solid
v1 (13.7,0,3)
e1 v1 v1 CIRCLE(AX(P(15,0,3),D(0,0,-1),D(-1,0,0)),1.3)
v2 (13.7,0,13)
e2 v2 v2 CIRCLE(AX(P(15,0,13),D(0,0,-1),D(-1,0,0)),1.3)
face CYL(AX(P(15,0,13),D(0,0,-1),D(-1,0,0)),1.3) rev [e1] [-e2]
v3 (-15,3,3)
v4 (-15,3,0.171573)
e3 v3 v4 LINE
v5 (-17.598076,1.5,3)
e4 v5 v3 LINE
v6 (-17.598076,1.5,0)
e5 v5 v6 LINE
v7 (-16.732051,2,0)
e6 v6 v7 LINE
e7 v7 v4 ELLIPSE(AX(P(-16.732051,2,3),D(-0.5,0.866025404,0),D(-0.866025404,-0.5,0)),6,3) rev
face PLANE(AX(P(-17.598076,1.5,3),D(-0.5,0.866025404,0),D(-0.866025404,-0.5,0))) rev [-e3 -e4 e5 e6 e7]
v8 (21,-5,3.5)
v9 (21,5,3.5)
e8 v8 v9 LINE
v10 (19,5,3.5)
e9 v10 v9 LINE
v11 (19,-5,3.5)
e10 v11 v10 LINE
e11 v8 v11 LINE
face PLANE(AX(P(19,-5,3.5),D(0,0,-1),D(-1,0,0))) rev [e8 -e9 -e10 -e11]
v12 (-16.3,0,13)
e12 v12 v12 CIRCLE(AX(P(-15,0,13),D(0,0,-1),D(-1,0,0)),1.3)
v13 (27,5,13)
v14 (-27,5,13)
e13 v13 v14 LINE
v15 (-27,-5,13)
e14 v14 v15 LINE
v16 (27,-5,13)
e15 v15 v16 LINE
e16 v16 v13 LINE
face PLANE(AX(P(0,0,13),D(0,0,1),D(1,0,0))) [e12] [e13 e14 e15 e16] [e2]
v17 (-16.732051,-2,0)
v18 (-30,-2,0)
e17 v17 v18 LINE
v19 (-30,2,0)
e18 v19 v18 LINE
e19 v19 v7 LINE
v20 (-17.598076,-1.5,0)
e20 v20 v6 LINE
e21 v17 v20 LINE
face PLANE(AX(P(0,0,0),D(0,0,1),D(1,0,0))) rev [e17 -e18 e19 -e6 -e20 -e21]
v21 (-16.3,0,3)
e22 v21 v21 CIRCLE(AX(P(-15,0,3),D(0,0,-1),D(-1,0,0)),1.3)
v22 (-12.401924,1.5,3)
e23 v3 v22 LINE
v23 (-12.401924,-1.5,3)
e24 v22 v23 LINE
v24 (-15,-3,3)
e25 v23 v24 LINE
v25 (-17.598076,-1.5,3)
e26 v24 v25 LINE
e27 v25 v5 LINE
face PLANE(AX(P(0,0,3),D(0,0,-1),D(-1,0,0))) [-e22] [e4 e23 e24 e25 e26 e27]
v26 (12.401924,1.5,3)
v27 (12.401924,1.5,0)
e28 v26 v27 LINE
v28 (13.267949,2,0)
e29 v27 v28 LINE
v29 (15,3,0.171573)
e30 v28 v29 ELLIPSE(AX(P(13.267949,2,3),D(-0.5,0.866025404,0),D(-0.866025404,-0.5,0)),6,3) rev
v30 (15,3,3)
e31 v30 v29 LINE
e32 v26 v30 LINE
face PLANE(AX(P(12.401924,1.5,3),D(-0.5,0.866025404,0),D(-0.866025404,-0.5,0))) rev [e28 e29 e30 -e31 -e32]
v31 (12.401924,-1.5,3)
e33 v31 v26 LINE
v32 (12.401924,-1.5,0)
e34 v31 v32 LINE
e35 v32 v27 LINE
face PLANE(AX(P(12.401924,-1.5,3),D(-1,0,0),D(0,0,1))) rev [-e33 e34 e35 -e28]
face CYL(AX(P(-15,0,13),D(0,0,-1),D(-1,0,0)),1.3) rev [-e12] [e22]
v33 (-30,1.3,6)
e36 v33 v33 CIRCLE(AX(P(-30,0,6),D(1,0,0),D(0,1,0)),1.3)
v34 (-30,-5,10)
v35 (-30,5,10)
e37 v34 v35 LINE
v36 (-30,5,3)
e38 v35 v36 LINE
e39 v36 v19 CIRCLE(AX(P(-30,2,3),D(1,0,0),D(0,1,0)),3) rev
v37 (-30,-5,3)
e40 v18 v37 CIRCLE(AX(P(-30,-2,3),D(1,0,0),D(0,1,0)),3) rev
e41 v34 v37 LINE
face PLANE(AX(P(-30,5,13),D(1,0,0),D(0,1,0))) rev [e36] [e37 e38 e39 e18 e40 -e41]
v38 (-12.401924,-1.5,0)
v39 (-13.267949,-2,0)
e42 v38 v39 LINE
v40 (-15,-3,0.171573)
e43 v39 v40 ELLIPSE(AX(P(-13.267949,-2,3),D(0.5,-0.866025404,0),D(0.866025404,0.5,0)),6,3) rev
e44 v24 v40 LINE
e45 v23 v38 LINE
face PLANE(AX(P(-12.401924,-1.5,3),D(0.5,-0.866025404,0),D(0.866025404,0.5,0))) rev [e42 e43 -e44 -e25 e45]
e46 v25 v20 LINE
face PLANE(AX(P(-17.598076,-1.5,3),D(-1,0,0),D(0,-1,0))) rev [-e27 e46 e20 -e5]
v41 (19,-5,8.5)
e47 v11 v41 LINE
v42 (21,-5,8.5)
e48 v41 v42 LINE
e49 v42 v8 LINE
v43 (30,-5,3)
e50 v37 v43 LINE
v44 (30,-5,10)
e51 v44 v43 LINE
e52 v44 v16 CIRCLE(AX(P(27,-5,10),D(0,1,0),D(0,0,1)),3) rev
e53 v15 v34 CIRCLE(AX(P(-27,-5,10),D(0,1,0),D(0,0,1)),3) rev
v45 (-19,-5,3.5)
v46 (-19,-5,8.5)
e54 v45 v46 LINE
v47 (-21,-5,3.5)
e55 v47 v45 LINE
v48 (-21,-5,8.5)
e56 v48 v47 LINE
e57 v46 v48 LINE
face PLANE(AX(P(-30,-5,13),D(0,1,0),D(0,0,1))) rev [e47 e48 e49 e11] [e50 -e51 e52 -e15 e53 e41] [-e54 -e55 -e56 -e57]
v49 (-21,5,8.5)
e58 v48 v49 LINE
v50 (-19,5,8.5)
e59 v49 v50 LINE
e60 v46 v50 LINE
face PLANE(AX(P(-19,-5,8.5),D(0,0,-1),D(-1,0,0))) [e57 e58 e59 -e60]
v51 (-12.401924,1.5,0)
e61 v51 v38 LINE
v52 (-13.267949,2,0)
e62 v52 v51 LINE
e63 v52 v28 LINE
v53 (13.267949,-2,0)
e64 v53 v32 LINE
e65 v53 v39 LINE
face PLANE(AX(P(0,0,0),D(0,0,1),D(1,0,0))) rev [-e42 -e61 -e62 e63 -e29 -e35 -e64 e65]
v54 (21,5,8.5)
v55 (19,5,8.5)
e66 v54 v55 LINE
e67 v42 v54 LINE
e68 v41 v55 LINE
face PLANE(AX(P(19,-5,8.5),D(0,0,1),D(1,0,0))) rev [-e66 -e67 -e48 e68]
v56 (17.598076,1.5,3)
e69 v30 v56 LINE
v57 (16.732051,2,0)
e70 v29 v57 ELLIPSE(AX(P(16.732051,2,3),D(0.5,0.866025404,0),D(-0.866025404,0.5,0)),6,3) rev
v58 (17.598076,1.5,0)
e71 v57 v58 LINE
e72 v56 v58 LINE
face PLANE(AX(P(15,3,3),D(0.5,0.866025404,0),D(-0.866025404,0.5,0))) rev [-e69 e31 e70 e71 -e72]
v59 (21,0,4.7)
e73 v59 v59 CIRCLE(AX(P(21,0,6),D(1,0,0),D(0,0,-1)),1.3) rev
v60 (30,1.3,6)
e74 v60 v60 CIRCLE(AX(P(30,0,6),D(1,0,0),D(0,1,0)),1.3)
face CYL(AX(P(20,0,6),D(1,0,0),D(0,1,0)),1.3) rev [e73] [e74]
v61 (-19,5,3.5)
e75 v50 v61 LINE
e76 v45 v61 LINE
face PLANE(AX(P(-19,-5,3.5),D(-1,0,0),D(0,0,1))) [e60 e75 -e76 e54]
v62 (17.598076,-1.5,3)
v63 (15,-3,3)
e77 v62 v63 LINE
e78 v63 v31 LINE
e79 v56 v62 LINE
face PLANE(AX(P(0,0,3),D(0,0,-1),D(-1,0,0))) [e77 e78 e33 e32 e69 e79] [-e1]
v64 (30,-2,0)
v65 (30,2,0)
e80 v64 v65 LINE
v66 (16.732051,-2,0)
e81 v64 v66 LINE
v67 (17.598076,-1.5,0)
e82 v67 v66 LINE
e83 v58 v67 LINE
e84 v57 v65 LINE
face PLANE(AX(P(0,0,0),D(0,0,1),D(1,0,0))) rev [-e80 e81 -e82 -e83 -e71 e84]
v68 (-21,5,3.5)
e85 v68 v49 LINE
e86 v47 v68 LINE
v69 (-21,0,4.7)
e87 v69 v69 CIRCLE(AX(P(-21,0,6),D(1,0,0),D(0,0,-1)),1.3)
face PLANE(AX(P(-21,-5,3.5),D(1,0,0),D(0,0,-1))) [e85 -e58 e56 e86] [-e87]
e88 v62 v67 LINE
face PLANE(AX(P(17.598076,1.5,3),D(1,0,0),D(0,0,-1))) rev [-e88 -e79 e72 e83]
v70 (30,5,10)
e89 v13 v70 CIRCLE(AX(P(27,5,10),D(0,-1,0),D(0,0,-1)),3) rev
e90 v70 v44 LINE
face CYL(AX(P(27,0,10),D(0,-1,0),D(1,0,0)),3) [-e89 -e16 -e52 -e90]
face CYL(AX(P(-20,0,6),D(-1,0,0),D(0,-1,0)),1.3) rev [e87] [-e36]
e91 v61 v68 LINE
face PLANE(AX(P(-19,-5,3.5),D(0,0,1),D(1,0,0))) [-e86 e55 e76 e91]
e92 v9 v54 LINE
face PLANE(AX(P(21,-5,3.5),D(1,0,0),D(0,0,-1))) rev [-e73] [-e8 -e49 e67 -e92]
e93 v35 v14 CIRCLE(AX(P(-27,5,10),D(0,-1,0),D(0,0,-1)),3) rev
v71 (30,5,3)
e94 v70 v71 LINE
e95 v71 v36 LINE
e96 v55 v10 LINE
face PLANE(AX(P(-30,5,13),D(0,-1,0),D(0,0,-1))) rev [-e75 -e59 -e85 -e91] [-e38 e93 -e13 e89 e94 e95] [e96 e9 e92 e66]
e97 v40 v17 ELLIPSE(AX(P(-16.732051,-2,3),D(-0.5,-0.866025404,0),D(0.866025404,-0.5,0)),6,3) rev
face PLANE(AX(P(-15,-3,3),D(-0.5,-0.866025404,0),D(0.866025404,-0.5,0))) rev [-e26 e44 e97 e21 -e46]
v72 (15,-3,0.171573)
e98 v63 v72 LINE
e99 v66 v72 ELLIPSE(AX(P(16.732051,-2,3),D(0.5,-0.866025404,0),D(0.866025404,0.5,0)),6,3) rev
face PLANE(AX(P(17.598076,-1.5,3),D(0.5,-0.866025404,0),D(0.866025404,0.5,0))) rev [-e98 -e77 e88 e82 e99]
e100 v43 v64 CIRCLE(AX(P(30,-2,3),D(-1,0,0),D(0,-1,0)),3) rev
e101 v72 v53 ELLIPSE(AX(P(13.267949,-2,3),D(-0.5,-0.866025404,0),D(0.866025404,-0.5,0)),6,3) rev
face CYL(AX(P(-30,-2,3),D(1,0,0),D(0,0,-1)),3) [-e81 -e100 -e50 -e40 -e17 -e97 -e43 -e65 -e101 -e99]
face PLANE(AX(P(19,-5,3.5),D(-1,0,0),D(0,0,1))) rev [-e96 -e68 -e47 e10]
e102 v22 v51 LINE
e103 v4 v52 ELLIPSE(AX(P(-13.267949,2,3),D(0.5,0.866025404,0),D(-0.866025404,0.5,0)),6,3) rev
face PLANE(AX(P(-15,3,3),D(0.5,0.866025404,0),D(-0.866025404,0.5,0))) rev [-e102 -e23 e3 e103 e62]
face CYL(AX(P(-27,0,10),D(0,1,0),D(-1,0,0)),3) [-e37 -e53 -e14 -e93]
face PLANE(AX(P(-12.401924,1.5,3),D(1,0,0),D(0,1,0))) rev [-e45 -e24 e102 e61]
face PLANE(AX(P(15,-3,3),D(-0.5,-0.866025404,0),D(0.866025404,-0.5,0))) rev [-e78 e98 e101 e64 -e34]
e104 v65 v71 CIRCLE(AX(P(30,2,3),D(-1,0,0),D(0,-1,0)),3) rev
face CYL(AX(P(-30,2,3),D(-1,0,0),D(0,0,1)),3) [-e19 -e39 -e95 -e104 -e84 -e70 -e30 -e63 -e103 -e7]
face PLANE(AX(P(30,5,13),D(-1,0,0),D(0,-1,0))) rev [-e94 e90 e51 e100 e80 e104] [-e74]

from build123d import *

# Parameters (mm, degrees)
SKETCH2_W           = 60
SKETCH2_H           = 10
BOSS_EXTRUDE1_DEPTH = 13
CUT_EXTRUDE1_DEPTH  = 3
SKETCH4_R           = 1.3
CUT_EXTRUDE2_DEPTH  = 33.015621187
FILLET1_R           = 3
FILLET2_R           = 3
SKETCH5_R           = 1.3
CUT_EXTRUDE3_DEPTH  = 10
SKETCH6_W           = 2
SKETCH6_H           = 5
CUT_EXTRUDE4_DEPTH  = 35.190641995


with BuildPart() as part:
    # Sketch2 → Boss-Extrude1 (new body)
    with BuildSketch(Plane.XY):
        Rectangle(SKETCH2_W, SKETCH2_H)
    extrude(amount=BOSS_EXTRUDE1_DEPTH)

    # Sketch3 → Cut-Extrude1 (cut)
    with BuildSketch(Plane(origin=(0, 0, 0), x_dir=(-1, 0, 0), z_dir=(0, 0, -1))):
        Polygon((-15, -3), (-12.401923789, -1.5), (-12.401923789, 1.5), (-15, 3), (-17.598076211, 1.5), (-17.598076211, -1.5), align=None)
        Polygon((15, -3), (17.598076211, -1.5), (17.598076211, 1.5), (15, 3), (12.401923789, 1.5), (12.401923789, -1.5), align=None)
    extrude(amount=-CUT_EXTRUDE1_DEPTH, mode=Mode.SUBTRACT)

    # Sketch4 → Cut-Extrude2 (cut, through all)
    with BuildSketch(Plane(origin=(0, 0, 3), x_dir=(-1, 0, 0), z_dir=(0, 0, -1))):
        with Locations((-15, 0)):
            Circle(SKETCH4_R)
        with Locations((15, 0)):
            Circle(SKETCH4_R)
    extrude(amount=-CUT_EXTRUDE2_DEPTH, mode=Mode.SUBTRACT)

    # Fillet1
    # the kernel refuses this fillet: 3 mm, written as the material it takes off along each edge
    with BuildSketch(Plane(origin=(37.5, -5, 0), x_dir=(0, 1, 0), z_dir=(-1, 0, 0))) as fillet1_piece_1:
        with BuildLine():
            CenterArc((FILLET1_R, -FILLET1_R), FILLET1_R, 90, 90)
            Line((0, -FILLET1_R), (0, 0))
            Line((0, 0), (FILLET1_R, 0))
        make_face()
    extrude(amount=75, mode=Mode.SUBTRACT)
    with BuildSketch(Plane(origin=(-37.5, 5, 0), x_dir=(0, 0, 1), z_dir=(1, 0, 0))) as fillet1_piece_2:
        with BuildLine():
            CenterArc((FILLET1_R, FILLET1_R), FILLET1_R, 180, 90)
            Line((0, FILLET1_R), (0, 0))
            Line((0, 0), (FILLET1_R, 0))
        make_face()
    extrude(amount=75, mode=Mode.SUBTRACT)

    # Fillet2
    fillet2_edges = [part.edges().sort_by_distance(p)[0] for p in [
        (-30, 0, 13),
        (30, 0, 13),
    ]]
    fillet(fillet2_edges, radius=FILLET2_R)

    # Sketch5 → Cut-Extrude3 (cut)
    with BuildSketch(Plane(origin=(30, 0, 0), x_dir=(0, 0, -1), z_dir=(1, 0, 0))):
        with Locations(Location((-6, 0, 0), (0, 0, 90))):
            Circle(SKETCH5_R)
    cut_extrude3 = extrude(amount=-CUT_EXTRUDE3_DEPTH, mode=Mode.SUBTRACT)

    # Sketch6 → Cut-Extrude4 (cut, symmetric)
    with BuildSketch(Plane(origin=(0, 5, 0), x_dir=(1, 0, 0), z_dir=(0, 1, 0))):
        with Locations((20, -6)):
            Rectangle(SKETCH6_W, SKETCH6_H)
    cut_extrude4 = extrude(amount=CUT_EXTRUDE4_DEPTH, both=True, mode=Mode.SUBTRACT)

    # Mirror1: Cut-Extrude3, Cut-Extrude4 across plane
    add(cut_extrude3.mirror(Plane(origin=(0, 0, 0), x_dir=(0, 0, 1), z_dir=(1, 0, 0))), mode=Mode.SUBTRACT)
    add(cut_extrude4.mirror(Plane(origin=(0, 0, 0), x_dir=(0, 0, 1), z_dir=(1, 0, 0))), mode=Mode.SUBTRACT)


solid = part.part
